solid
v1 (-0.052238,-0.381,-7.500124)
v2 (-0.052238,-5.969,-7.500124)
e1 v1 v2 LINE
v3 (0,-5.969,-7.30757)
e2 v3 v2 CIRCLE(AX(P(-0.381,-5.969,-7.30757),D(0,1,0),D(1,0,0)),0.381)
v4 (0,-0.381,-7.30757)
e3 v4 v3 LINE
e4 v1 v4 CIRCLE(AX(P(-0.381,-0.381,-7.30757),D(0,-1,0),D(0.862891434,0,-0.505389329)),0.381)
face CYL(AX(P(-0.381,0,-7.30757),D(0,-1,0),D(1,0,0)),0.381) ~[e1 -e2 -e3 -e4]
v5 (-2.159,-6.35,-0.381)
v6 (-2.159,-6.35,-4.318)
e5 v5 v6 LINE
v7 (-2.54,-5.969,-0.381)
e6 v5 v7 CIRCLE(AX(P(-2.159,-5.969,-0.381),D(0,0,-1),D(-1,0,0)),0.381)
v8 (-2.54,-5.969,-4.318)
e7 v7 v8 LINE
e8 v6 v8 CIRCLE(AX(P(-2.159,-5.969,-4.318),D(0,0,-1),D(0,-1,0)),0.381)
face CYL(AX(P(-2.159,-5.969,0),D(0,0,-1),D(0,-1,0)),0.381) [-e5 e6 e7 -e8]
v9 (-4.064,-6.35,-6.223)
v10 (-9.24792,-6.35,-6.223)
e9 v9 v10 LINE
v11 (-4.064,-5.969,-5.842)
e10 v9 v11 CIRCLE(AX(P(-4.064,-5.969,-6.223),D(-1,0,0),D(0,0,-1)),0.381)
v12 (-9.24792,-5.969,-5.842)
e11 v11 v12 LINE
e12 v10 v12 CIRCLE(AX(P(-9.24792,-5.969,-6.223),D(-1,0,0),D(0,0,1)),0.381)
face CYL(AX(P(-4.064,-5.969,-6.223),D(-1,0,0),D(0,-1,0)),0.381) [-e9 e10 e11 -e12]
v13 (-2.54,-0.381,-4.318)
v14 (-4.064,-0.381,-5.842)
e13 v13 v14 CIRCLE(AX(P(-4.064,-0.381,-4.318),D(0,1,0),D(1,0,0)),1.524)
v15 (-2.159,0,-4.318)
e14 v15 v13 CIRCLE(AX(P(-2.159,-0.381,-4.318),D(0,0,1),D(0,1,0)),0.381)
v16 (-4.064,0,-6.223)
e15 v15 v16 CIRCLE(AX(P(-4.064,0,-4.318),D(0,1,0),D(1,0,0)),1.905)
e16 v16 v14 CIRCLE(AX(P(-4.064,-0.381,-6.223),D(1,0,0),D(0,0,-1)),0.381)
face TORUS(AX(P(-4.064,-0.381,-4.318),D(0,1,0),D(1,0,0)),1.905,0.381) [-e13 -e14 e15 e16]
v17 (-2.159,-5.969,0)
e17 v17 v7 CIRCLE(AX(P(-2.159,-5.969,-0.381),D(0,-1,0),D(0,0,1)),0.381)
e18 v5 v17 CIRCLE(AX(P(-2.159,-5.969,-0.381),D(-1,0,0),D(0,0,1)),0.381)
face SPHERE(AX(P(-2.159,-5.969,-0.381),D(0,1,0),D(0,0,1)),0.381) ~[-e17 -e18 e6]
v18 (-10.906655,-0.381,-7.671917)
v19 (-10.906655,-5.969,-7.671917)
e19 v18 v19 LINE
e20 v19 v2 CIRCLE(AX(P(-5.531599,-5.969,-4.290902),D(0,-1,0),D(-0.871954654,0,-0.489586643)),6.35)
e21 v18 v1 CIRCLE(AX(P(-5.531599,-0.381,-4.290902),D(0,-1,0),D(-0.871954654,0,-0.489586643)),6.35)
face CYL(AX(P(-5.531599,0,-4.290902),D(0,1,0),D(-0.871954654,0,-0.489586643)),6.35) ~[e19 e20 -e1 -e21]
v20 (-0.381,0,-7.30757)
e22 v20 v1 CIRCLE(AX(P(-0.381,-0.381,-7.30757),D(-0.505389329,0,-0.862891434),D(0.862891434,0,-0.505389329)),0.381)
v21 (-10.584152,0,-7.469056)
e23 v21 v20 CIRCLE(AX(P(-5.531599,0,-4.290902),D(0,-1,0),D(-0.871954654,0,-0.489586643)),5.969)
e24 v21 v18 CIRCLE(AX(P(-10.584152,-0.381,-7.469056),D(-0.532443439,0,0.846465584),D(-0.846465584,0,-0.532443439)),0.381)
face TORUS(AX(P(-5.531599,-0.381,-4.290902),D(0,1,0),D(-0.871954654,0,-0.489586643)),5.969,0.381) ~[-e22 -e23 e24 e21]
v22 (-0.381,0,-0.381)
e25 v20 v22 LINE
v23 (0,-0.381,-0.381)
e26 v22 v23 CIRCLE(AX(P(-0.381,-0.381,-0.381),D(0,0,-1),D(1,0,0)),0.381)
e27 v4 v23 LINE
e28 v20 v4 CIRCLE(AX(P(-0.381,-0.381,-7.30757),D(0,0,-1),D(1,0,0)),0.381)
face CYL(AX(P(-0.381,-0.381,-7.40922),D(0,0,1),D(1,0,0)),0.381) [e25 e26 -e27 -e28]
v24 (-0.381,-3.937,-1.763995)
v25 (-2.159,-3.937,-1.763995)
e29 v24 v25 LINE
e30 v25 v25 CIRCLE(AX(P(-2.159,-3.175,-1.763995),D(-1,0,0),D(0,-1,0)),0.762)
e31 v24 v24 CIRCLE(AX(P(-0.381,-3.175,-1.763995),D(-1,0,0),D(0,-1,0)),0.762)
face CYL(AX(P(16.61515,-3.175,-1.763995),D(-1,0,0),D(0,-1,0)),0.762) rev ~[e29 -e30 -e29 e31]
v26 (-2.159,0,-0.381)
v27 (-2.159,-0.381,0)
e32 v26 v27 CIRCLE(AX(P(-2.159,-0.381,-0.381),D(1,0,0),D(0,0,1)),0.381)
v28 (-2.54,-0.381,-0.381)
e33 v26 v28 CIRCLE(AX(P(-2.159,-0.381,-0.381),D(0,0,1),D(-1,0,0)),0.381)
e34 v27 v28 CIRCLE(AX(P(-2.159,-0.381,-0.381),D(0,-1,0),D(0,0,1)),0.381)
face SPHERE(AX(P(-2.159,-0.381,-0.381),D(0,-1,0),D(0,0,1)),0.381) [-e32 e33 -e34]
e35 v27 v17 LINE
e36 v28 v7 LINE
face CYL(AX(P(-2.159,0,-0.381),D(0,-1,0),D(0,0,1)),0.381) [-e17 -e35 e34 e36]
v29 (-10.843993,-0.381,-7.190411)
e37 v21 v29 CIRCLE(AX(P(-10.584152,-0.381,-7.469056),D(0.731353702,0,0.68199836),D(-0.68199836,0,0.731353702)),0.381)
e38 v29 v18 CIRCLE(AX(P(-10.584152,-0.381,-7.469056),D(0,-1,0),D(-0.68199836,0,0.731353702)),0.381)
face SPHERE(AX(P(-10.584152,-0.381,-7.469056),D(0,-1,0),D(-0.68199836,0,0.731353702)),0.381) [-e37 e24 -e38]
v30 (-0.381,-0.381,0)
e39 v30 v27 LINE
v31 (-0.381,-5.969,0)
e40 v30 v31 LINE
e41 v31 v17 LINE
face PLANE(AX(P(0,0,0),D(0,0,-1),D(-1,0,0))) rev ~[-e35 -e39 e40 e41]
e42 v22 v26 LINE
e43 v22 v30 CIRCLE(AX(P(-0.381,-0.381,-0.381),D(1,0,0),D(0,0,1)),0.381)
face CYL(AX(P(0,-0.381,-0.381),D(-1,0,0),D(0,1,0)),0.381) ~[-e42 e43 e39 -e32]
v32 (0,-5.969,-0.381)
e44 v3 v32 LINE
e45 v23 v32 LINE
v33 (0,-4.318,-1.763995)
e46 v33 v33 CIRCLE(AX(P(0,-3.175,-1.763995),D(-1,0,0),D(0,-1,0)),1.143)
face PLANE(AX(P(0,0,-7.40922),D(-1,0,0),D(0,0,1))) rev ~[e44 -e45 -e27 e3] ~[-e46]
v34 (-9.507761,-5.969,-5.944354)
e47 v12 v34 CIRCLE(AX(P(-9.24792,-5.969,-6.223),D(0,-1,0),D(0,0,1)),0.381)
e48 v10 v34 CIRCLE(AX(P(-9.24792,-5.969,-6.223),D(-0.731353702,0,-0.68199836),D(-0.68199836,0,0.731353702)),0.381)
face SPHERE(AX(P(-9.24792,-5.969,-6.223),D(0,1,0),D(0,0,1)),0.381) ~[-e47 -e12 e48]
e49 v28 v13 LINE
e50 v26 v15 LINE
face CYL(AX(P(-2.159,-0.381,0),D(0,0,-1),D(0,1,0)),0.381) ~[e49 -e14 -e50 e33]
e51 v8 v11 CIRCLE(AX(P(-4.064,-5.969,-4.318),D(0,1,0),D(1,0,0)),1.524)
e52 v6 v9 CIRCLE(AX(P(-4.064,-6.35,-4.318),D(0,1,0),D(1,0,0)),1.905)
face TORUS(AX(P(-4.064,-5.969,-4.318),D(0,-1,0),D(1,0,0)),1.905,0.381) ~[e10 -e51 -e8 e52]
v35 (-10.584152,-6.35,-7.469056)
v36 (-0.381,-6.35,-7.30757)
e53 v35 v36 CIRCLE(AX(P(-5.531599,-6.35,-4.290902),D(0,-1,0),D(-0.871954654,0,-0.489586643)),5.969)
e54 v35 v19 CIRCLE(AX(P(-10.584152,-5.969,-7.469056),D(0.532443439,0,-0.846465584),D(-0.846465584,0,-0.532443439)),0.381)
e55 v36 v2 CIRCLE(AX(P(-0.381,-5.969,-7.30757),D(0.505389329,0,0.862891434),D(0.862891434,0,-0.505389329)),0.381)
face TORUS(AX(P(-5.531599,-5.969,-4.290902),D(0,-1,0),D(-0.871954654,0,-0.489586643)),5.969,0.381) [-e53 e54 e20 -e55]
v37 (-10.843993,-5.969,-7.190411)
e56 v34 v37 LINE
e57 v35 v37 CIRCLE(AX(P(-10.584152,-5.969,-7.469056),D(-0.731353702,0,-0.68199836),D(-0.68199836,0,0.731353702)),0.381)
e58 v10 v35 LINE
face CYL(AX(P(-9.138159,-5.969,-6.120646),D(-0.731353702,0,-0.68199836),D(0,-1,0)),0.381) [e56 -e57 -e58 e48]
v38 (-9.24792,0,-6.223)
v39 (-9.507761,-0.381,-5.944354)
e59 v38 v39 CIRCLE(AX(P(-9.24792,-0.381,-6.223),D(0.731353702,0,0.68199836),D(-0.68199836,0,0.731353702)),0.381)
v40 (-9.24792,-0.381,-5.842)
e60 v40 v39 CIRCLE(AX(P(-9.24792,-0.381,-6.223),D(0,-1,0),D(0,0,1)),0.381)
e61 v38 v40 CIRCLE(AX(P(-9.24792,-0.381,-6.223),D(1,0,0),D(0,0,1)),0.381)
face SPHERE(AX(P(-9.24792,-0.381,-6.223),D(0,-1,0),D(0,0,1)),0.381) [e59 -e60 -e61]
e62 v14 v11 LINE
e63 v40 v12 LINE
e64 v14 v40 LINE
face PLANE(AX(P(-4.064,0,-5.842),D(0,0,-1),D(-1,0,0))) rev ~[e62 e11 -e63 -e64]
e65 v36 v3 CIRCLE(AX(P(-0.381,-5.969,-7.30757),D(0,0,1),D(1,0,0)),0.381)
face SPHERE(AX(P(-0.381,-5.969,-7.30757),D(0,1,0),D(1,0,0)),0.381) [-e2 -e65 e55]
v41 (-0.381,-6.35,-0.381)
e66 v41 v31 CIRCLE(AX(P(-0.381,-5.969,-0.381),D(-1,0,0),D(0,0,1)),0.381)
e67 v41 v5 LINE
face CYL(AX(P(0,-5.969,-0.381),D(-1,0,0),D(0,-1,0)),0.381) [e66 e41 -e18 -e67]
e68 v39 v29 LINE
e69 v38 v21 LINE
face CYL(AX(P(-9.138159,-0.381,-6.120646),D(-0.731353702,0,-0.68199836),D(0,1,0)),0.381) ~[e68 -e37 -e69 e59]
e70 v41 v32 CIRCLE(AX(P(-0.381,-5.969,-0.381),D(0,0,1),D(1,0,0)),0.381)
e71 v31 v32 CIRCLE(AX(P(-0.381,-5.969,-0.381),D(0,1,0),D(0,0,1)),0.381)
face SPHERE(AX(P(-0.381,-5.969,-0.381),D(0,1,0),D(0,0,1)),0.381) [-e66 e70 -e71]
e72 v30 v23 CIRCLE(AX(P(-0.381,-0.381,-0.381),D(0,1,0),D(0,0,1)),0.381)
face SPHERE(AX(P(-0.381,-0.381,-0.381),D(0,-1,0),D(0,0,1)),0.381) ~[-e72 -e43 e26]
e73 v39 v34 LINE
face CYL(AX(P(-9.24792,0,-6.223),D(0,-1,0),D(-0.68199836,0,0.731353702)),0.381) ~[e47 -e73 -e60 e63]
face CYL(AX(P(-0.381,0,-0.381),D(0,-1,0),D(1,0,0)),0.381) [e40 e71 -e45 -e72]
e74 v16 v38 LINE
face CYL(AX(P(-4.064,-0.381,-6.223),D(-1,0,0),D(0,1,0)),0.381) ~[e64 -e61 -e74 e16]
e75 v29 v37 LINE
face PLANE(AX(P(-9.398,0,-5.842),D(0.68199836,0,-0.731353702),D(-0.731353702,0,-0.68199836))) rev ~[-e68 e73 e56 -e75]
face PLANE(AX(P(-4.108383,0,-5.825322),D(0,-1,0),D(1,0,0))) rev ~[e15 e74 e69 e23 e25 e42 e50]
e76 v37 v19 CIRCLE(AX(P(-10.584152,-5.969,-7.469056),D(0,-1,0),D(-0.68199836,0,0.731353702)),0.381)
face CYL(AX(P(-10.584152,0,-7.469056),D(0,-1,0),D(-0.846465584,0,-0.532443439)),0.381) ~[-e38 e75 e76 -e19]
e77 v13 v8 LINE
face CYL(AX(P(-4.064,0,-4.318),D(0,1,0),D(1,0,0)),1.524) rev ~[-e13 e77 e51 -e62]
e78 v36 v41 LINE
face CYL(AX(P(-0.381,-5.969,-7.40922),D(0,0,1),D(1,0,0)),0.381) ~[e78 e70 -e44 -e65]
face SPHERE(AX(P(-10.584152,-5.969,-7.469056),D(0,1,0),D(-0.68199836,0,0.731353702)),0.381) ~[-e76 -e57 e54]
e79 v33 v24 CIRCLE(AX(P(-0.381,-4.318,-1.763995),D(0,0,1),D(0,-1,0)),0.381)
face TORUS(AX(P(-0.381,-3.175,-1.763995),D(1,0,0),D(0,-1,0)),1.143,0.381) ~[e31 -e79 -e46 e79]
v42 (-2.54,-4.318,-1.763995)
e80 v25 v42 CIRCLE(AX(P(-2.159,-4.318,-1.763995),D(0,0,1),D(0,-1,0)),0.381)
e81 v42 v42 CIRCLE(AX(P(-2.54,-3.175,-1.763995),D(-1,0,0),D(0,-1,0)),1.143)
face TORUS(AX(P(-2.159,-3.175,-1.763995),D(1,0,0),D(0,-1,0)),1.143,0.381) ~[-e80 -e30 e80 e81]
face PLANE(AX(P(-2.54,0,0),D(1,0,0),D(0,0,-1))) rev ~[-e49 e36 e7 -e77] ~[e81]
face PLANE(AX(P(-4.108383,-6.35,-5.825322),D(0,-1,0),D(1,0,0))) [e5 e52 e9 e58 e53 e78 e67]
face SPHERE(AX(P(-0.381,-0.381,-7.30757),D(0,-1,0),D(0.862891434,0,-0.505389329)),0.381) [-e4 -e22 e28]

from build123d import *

# Parameters (mm, degrees)
F1_DEPTH = 6.35
F3_D     = 1.524
F4_R     = 0.381


with BuildPart() as f1:
    # F0 (on Front) → F1 (new body)
    with BuildSketch(Plane.XZ):
        with BuildLine():
            Line((0, -7.4092204591), (0, 0))
            Line((0, 0), (-2.54, 0))
            Line((-2.54, 0), (-2.54, -4.318))
            ThreePointArc((-2.54, -4.318), (-2.9863692655, -5.3956307345), (-4.064, -5.842))
            Line((-4.064, -5.842), (-9.398, -5.842))
            Line((-9.398, -5.842), (-11.068511021, -7.3997767286))
            ThreePointArc((-11.068511021, -7.3997767286), (-5.53701683, -10.6408992323), (0, -7.4092204591))
        make_face()
    extrude(amount=F1_DEPTH)

    # F3 (through all)
    with Locations(Plane.YZ):
        with Locations((-3.175, -1.7639952663)):
            Hole(F3_D / 2)

    # F4
    f4_edges = [f1.edges().sort_by_distance(p)[0] for p in [
        (-2.54, -3.175, 0),
        (0, -3.175, 0),
        (-1.27, -6.35, 0),
        (-1.27, 0, 0),
        (0, -6.35, -3.70461),
        (-2.54, -6.35, -2.159),
        (-2.986369, -6.35, -5.395631),
        (-6.731, -6.35, -5.842),
        (-10.233256, -6.35, -6.620888),
        (-5.537017, -6.35, -10.640899),
        (0, -3.175, -7.40922),
        (-9.398, -3.175, -5.842),
        (-2.54, 0, -2.159),
        (-2.986369, 0, -5.395631),
        (-6.731, 0, -5.842),
        (-10.233256, 0, -6.620888),
        (-5.537017, 0, -10.640899),
        (0, 0, -3.70461),
        (-11.068511, -3.175, -7.399777),
        (0, -3.937, -1.763995),
        (-2.54, -3.937, -1.763995),
    ]]
    fillet(f4_edges, radius=F4_R)


solid = f1.part
